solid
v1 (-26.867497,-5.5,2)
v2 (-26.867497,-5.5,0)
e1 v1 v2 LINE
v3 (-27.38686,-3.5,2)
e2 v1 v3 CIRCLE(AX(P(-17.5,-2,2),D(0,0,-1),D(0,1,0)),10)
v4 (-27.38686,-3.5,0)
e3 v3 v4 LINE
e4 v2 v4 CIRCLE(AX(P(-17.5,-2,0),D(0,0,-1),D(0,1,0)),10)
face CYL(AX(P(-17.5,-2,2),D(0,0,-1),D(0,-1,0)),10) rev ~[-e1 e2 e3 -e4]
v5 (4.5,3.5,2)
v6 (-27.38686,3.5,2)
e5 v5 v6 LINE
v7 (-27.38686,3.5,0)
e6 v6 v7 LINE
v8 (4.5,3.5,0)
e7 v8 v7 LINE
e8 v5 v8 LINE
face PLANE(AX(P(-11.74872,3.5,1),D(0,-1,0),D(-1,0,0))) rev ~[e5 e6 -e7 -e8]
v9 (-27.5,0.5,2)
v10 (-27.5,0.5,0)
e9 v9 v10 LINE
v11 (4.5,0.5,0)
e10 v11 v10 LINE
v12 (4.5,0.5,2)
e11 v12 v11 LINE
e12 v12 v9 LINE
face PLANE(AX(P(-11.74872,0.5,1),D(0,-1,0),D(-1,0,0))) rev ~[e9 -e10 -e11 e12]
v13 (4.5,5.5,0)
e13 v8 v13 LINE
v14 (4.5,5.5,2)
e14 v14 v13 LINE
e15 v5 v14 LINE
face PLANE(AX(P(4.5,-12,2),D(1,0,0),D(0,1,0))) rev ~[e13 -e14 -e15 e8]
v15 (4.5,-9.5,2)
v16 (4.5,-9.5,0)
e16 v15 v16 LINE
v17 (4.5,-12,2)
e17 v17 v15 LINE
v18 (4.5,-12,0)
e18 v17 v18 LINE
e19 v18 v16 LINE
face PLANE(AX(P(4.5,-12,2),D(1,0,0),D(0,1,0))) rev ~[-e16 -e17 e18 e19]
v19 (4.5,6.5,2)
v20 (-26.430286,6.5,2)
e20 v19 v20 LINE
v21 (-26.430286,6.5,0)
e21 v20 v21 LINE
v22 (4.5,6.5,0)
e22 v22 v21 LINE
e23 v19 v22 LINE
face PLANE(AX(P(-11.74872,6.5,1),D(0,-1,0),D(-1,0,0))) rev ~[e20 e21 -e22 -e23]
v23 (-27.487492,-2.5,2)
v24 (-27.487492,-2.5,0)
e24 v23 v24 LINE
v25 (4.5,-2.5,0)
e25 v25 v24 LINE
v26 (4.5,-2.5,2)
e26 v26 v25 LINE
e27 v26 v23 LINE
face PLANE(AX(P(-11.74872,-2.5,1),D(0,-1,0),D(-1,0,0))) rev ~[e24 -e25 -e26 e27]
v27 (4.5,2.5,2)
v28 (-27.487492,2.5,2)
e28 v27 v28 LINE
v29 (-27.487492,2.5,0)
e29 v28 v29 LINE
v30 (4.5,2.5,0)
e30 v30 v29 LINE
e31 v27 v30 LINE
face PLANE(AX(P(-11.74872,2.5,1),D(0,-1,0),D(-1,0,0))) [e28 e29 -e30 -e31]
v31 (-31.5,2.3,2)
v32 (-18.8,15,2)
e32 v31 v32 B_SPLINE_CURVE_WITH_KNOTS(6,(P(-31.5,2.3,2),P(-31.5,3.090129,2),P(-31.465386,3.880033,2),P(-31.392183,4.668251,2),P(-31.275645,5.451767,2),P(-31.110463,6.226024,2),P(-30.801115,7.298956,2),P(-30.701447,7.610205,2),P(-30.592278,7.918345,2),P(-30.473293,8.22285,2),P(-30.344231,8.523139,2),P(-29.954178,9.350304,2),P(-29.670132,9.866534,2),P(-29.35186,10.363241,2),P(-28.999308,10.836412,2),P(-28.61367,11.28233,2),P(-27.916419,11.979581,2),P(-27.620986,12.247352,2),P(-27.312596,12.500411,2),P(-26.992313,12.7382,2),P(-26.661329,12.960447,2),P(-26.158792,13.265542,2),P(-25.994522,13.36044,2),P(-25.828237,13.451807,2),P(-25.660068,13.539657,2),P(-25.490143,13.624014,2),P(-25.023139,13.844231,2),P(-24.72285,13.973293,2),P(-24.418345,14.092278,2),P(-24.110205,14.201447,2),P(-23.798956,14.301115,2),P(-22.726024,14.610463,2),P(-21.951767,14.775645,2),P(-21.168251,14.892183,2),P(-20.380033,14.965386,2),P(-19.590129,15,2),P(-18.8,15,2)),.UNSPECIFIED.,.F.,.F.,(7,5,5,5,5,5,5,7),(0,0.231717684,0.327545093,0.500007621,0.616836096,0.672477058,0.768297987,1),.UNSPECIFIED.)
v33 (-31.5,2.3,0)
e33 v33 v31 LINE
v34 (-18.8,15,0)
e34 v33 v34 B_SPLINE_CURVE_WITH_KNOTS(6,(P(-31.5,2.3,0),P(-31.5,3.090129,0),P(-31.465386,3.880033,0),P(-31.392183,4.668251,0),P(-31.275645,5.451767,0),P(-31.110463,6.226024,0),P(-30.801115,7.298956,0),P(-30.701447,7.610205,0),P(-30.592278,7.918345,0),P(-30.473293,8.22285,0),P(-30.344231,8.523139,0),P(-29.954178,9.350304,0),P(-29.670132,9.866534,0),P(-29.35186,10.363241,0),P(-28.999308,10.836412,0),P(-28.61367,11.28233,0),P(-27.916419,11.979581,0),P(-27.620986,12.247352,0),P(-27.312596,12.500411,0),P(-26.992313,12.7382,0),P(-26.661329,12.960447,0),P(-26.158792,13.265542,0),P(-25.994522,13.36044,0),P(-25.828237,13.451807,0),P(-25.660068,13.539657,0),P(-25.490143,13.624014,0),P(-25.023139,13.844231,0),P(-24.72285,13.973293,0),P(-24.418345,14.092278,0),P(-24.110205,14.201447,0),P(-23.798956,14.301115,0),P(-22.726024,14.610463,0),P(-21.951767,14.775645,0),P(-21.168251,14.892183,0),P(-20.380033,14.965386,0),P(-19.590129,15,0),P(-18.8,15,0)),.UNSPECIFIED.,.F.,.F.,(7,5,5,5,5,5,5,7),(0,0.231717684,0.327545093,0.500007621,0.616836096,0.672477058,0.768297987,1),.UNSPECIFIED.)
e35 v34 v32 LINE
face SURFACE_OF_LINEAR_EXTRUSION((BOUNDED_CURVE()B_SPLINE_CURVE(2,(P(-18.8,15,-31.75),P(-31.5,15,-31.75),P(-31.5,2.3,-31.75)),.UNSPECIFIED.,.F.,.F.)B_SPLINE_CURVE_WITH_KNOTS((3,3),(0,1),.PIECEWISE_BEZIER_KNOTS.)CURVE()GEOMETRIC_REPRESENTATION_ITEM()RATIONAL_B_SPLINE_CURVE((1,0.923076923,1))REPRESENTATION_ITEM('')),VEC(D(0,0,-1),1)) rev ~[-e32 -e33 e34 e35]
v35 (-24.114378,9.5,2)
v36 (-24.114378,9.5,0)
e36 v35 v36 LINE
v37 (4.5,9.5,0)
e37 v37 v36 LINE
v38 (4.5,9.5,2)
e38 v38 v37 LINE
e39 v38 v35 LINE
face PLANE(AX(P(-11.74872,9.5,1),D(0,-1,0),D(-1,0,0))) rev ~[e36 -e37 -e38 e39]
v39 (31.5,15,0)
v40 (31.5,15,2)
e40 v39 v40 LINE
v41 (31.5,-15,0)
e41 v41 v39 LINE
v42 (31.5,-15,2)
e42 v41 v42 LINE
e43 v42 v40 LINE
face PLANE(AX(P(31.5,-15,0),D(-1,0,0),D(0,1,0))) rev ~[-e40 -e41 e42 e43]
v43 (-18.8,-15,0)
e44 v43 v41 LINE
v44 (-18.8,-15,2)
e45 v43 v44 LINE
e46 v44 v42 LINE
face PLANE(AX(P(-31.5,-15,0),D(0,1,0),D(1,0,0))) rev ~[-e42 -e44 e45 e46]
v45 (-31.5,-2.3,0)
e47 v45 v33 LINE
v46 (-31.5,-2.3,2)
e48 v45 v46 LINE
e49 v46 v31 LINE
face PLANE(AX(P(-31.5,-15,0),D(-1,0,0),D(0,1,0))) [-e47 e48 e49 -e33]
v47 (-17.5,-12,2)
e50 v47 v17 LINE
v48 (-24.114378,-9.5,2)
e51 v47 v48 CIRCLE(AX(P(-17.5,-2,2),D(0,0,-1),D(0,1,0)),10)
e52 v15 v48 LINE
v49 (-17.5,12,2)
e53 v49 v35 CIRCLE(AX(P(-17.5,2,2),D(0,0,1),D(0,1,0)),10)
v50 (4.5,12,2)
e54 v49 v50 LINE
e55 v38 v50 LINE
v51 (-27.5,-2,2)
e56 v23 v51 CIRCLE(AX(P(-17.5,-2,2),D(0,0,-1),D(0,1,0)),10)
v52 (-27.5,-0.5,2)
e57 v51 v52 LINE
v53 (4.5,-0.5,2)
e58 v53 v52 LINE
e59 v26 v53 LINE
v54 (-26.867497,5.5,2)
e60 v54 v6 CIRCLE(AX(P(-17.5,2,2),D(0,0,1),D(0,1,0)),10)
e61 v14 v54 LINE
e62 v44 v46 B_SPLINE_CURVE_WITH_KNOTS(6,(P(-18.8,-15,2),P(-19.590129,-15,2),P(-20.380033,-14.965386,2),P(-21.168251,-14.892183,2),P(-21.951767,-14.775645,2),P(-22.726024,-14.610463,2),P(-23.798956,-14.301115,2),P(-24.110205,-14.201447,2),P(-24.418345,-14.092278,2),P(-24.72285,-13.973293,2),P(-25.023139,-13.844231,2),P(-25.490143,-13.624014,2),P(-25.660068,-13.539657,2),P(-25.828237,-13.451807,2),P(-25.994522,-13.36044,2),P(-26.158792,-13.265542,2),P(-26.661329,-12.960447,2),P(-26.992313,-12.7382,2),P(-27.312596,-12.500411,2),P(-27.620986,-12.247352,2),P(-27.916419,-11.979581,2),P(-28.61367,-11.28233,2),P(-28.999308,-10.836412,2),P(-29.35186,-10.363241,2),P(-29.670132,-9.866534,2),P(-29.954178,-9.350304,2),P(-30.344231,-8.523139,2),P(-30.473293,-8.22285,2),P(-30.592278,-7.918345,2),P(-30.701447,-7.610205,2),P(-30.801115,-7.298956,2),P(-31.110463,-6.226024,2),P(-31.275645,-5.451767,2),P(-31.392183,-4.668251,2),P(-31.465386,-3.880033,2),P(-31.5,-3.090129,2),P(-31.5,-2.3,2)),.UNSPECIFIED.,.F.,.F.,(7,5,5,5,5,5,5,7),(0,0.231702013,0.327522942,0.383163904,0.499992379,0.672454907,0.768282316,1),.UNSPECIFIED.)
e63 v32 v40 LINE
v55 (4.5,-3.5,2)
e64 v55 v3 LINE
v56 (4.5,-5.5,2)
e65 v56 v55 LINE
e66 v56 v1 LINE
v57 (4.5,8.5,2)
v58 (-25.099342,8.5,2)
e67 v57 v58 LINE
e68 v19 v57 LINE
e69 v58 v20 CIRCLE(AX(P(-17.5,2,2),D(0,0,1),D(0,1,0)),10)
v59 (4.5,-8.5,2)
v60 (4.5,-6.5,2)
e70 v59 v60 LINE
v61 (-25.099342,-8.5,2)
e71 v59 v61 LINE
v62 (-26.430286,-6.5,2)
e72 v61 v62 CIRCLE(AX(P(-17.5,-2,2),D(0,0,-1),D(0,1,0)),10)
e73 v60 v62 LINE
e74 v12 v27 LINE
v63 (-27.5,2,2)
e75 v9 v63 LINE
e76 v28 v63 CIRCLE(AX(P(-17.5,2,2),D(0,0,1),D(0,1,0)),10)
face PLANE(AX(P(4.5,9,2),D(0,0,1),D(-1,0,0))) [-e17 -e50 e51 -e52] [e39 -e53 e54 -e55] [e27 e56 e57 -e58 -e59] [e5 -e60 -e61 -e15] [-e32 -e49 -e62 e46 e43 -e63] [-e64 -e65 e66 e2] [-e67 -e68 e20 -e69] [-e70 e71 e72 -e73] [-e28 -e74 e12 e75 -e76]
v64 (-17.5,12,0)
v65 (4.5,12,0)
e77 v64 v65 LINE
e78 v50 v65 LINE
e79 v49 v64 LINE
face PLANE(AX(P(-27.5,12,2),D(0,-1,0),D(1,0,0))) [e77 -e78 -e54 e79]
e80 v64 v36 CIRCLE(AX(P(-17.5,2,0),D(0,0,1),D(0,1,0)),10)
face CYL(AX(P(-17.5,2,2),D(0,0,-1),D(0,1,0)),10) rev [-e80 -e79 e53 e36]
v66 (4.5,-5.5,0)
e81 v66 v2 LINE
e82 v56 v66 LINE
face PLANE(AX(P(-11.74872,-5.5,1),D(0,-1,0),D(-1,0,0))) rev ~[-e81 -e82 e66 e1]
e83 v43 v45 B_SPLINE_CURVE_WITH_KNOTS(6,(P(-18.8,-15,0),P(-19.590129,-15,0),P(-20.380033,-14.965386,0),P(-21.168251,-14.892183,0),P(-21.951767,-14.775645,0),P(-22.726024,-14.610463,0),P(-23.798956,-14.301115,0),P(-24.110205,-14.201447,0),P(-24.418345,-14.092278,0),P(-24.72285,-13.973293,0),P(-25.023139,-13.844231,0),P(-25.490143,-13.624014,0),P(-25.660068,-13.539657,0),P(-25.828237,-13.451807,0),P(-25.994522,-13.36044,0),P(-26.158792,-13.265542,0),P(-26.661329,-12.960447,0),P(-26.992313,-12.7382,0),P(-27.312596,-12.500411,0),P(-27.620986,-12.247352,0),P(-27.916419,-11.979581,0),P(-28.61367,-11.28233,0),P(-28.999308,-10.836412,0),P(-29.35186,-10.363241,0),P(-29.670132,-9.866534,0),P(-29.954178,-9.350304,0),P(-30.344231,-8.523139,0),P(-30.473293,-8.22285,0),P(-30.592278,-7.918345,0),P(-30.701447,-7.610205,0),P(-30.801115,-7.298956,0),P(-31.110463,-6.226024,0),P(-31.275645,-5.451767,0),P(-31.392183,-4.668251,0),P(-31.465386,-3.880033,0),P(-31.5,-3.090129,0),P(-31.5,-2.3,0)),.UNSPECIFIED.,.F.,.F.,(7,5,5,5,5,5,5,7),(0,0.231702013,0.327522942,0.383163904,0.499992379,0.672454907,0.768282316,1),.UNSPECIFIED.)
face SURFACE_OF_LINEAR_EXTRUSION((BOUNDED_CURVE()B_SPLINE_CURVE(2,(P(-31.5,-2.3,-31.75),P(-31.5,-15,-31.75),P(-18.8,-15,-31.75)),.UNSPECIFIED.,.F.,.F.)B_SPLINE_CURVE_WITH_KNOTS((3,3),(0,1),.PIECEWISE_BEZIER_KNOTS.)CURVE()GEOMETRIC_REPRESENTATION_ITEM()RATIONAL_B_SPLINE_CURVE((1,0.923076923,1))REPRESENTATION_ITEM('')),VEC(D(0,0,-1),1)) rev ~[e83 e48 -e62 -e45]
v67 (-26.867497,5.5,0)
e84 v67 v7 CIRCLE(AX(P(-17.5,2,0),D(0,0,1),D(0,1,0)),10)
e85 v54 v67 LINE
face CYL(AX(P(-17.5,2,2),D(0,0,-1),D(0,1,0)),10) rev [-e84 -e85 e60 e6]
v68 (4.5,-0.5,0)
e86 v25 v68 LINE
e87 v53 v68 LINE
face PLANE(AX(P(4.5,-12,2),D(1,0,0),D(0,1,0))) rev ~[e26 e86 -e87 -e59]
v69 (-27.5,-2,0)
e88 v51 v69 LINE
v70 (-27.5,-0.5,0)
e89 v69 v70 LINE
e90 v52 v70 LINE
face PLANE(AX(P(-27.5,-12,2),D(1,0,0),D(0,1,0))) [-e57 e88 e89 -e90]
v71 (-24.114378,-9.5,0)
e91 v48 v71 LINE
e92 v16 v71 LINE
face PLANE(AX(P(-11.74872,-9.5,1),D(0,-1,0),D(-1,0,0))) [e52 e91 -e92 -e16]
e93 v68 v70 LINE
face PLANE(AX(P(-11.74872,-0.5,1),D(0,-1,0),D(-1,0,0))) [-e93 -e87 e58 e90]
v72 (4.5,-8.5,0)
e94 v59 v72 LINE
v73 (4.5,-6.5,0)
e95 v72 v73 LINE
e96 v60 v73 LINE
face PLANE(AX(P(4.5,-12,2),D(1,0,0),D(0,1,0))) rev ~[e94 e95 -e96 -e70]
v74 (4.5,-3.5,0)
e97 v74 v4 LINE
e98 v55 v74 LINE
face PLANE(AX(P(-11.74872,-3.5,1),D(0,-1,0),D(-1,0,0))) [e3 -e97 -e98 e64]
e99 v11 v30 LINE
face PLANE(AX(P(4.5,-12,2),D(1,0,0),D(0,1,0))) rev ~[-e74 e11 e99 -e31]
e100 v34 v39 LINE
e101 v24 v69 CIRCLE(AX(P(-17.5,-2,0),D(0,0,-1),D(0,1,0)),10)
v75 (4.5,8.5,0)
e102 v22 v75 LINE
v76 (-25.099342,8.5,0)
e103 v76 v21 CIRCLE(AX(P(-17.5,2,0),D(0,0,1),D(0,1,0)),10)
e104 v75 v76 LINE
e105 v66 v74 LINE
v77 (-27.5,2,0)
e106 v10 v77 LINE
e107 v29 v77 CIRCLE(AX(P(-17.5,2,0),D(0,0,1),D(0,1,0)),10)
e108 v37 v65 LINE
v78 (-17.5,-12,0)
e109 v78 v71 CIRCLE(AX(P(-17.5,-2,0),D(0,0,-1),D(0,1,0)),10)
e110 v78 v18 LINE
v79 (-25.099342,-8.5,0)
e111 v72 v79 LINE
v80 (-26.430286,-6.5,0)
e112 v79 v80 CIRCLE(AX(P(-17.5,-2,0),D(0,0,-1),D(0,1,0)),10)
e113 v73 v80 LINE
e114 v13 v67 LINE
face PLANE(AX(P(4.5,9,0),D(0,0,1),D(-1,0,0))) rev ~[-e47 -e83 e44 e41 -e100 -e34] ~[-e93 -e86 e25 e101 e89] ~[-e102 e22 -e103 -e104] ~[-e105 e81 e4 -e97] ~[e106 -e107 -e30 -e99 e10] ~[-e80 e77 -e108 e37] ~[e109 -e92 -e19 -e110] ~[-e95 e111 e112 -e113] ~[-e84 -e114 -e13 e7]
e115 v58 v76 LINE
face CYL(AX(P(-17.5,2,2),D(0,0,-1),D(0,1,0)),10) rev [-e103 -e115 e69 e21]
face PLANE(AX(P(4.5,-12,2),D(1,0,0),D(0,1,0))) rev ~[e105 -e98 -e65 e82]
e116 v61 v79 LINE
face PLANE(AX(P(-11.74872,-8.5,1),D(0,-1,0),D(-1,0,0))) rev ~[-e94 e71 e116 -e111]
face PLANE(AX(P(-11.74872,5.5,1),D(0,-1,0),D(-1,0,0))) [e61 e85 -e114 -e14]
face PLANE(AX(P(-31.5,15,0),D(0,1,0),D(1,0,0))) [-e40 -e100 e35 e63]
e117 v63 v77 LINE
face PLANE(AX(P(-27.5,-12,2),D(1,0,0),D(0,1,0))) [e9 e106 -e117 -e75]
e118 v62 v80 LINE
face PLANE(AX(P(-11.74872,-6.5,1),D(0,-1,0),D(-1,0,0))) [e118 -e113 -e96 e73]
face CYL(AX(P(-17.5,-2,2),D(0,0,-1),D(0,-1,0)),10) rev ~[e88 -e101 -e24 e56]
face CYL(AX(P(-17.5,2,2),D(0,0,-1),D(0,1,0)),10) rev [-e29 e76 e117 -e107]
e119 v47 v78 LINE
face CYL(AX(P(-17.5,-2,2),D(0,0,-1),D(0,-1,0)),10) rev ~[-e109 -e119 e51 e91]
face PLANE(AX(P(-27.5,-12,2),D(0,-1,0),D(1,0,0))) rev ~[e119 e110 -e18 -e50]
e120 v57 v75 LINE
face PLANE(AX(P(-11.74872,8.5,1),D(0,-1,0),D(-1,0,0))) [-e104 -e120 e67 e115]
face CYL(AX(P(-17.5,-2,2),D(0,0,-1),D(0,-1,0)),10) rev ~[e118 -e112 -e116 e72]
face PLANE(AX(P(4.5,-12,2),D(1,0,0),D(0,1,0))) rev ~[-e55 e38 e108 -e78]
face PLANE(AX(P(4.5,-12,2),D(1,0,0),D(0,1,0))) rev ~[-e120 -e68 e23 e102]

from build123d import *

# Parameters (mm, degrees)
F0_W          = 63
F0_H          = 30
F1_DEPTH      = 2
F2_T1_DEPTH   = 65.5
F3_W          = 32
F3_H          = 24
F4_DEPTH      = 25
F5_R          = 10
F7_E2_W       = 32.4974397272
F7_E2_H       = 2
F7_E3_0_1_0_W = 32.4974397272
F7_E3_0_1_0_H = 2
F7_E3_0_2_0_W = 32.4974397272
F7_E3_0_2_0_H = 2
F7_E3_0_3_0_W = 32.4974397272
F7_E3_0_3_0_H = 2
F7_E3_0_4_0_W = 32.4974397272
F7_E3_0_4_0_H = 2
F7_E3_0_5_0_W = 32.4974397272
F7_E3_0_5_0_H = 2
F7_E3_0_6_0_W = 32.4974397272
F7_E3_0_6_0_H = 2
F8_DEPTH      = 0.5


# Not quite as in the source:
# - a fillet or chamfer that OpenCascade refuses, or shapes differently, is made with other operations: its cross-section is extruded or revolved along the edge and cut away or added


with BuildPart() as f1:
    # F0 (on Top) → F1 (new body)
    with BuildSketch(Plane.XY):
        Rectangle(F0_W, F0_H)
    extrude(amount=F1_DEPTH)

    # F2: fillet of radius 12.7 on 2 edges, made by hand

    # F2_s2 → F2_t1 (cut)
    with BuildSketch(Plane.XY.offset(-31.75)):
        with BuildLine():
            add(Edge.make_bspline(
                [(-18.8, 15), (-31.5, 15), (-31.5, 2.3)],
                knots=[0, 0, 0, 1, 1, 1], degree=2, weights=[1, 0.9230769231, 1]))
            Line((-31.5, 2.3), (-31.5, 15))
            Line((-31.5, 15), (-18.8, 15))
        make_face()
        with BuildLine():
            add(Edge.make_bspline(
                [(-31.5, -2.3), (-31.5, -15), (-18.8, -15)],
                knots=[0, 0, 0, 1, 1, 1], degree=2, weights=[1, 0.9230769231, 1]))
            Line((-18.8, -15), (-31.5, -15))
            Line((-31.5, -15), (-31.5, -2.3))
        make_face()
    extrude(amount=F2_T1_DEPTH, mode=Mode.SUBTRACT)

    # F3 (on face) → F4 (cut)
    with BuildSketch(Plane.XY.offset(2)):
        with Locations((-11.5, 0)):
            Rectangle(F3_W, F3_H)
    extrude(amount=-F4_DEPTH, mode=Mode.SUBTRACT)

    # F5
    f5_edges = [f1.edges().sort_by_distance(p)[0] for p in [
        (-27.5, 12, 1),
        (-27.5, -12, 1),
    ]]
    fillet(f5_edges, radius=F5_R)

    # F7_E2 (on explicit) + F7_E3_0_1_0 (on explicit) + F7_E3_0_2_0 (on explicit) + F7_E3_0_3_0 (on explicit) + F7_E3_0_4_0 (on explicit) + F7_E3_0_5_0 (on explicit) + F7_E3_0_6_0 (on explicit) → F8 (join, symmetric)
    with BuildSketch(Plane(origin=(4.5, -9, 2), x_dir=(-1, 0, 0), z_dir=(0, -1, 0))):
        with Locations((16.2487198636, 1)):
            Rectangle(F7_E2_W, F7_E2_H)
    with BuildSketch(Plane(origin=(4.5, -6, 2), x_dir=(-1, 0, 0), z_dir=(0, -1, 0))):
        with Locations((16.2487198636, 1)):
            Rectangle(F7_E3_0_1_0_W, F7_E3_0_1_0_H)
    with BuildSketch(Plane(origin=(4.5, -3, 2), x_dir=(-1, 0, 0), z_dir=(0, -1, 0))):
        with Locations((16.2487198636, 1)):
            Rectangle(F7_E3_0_2_0_W, F7_E3_0_2_0_H)
    with BuildSketch(Plane(origin=(4.5, 0, 2), x_dir=(-1, 0, 0), z_dir=(0, -1, 0))):
        with Locations((16.2487198636, 1)):
            Rectangle(F7_E3_0_3_0_W, F7_E3_0_3_0_H)
    with BuildSketch(Plane(origin=(4.5, 3, 2), x_dir=(-1, 0, 0), z_dir=(0, -1, 0))):
        with Locations((16.2487198636, 1)):
            Rectangle(F7_E3_0_4_0_W, F7_E3_0_4_0_H)
    with BuildSketch(Plane(origin=(4.5, 6, 2), x_dir=(-1, 0, 0), z_dir=(0, -1, 0))):
        with Locations((16.2487198636, 1)):
            Rectangle(F7_E3_0_5_0_W, F7_E3_0_5_0_H)
    with BuildSketch(Plane(origin=(4.5, 9, 2), x_dir=(-1, 0, 0), z_dir=(0, -1, 0))):
        with Locations((16.2487198636, 1)):
            Rectangle(F7_E3_0_6_0_W, F7_E3_0_6_0_H)
    extrude(amount=F8_DEPTH, both=True)


solid = f1.part
